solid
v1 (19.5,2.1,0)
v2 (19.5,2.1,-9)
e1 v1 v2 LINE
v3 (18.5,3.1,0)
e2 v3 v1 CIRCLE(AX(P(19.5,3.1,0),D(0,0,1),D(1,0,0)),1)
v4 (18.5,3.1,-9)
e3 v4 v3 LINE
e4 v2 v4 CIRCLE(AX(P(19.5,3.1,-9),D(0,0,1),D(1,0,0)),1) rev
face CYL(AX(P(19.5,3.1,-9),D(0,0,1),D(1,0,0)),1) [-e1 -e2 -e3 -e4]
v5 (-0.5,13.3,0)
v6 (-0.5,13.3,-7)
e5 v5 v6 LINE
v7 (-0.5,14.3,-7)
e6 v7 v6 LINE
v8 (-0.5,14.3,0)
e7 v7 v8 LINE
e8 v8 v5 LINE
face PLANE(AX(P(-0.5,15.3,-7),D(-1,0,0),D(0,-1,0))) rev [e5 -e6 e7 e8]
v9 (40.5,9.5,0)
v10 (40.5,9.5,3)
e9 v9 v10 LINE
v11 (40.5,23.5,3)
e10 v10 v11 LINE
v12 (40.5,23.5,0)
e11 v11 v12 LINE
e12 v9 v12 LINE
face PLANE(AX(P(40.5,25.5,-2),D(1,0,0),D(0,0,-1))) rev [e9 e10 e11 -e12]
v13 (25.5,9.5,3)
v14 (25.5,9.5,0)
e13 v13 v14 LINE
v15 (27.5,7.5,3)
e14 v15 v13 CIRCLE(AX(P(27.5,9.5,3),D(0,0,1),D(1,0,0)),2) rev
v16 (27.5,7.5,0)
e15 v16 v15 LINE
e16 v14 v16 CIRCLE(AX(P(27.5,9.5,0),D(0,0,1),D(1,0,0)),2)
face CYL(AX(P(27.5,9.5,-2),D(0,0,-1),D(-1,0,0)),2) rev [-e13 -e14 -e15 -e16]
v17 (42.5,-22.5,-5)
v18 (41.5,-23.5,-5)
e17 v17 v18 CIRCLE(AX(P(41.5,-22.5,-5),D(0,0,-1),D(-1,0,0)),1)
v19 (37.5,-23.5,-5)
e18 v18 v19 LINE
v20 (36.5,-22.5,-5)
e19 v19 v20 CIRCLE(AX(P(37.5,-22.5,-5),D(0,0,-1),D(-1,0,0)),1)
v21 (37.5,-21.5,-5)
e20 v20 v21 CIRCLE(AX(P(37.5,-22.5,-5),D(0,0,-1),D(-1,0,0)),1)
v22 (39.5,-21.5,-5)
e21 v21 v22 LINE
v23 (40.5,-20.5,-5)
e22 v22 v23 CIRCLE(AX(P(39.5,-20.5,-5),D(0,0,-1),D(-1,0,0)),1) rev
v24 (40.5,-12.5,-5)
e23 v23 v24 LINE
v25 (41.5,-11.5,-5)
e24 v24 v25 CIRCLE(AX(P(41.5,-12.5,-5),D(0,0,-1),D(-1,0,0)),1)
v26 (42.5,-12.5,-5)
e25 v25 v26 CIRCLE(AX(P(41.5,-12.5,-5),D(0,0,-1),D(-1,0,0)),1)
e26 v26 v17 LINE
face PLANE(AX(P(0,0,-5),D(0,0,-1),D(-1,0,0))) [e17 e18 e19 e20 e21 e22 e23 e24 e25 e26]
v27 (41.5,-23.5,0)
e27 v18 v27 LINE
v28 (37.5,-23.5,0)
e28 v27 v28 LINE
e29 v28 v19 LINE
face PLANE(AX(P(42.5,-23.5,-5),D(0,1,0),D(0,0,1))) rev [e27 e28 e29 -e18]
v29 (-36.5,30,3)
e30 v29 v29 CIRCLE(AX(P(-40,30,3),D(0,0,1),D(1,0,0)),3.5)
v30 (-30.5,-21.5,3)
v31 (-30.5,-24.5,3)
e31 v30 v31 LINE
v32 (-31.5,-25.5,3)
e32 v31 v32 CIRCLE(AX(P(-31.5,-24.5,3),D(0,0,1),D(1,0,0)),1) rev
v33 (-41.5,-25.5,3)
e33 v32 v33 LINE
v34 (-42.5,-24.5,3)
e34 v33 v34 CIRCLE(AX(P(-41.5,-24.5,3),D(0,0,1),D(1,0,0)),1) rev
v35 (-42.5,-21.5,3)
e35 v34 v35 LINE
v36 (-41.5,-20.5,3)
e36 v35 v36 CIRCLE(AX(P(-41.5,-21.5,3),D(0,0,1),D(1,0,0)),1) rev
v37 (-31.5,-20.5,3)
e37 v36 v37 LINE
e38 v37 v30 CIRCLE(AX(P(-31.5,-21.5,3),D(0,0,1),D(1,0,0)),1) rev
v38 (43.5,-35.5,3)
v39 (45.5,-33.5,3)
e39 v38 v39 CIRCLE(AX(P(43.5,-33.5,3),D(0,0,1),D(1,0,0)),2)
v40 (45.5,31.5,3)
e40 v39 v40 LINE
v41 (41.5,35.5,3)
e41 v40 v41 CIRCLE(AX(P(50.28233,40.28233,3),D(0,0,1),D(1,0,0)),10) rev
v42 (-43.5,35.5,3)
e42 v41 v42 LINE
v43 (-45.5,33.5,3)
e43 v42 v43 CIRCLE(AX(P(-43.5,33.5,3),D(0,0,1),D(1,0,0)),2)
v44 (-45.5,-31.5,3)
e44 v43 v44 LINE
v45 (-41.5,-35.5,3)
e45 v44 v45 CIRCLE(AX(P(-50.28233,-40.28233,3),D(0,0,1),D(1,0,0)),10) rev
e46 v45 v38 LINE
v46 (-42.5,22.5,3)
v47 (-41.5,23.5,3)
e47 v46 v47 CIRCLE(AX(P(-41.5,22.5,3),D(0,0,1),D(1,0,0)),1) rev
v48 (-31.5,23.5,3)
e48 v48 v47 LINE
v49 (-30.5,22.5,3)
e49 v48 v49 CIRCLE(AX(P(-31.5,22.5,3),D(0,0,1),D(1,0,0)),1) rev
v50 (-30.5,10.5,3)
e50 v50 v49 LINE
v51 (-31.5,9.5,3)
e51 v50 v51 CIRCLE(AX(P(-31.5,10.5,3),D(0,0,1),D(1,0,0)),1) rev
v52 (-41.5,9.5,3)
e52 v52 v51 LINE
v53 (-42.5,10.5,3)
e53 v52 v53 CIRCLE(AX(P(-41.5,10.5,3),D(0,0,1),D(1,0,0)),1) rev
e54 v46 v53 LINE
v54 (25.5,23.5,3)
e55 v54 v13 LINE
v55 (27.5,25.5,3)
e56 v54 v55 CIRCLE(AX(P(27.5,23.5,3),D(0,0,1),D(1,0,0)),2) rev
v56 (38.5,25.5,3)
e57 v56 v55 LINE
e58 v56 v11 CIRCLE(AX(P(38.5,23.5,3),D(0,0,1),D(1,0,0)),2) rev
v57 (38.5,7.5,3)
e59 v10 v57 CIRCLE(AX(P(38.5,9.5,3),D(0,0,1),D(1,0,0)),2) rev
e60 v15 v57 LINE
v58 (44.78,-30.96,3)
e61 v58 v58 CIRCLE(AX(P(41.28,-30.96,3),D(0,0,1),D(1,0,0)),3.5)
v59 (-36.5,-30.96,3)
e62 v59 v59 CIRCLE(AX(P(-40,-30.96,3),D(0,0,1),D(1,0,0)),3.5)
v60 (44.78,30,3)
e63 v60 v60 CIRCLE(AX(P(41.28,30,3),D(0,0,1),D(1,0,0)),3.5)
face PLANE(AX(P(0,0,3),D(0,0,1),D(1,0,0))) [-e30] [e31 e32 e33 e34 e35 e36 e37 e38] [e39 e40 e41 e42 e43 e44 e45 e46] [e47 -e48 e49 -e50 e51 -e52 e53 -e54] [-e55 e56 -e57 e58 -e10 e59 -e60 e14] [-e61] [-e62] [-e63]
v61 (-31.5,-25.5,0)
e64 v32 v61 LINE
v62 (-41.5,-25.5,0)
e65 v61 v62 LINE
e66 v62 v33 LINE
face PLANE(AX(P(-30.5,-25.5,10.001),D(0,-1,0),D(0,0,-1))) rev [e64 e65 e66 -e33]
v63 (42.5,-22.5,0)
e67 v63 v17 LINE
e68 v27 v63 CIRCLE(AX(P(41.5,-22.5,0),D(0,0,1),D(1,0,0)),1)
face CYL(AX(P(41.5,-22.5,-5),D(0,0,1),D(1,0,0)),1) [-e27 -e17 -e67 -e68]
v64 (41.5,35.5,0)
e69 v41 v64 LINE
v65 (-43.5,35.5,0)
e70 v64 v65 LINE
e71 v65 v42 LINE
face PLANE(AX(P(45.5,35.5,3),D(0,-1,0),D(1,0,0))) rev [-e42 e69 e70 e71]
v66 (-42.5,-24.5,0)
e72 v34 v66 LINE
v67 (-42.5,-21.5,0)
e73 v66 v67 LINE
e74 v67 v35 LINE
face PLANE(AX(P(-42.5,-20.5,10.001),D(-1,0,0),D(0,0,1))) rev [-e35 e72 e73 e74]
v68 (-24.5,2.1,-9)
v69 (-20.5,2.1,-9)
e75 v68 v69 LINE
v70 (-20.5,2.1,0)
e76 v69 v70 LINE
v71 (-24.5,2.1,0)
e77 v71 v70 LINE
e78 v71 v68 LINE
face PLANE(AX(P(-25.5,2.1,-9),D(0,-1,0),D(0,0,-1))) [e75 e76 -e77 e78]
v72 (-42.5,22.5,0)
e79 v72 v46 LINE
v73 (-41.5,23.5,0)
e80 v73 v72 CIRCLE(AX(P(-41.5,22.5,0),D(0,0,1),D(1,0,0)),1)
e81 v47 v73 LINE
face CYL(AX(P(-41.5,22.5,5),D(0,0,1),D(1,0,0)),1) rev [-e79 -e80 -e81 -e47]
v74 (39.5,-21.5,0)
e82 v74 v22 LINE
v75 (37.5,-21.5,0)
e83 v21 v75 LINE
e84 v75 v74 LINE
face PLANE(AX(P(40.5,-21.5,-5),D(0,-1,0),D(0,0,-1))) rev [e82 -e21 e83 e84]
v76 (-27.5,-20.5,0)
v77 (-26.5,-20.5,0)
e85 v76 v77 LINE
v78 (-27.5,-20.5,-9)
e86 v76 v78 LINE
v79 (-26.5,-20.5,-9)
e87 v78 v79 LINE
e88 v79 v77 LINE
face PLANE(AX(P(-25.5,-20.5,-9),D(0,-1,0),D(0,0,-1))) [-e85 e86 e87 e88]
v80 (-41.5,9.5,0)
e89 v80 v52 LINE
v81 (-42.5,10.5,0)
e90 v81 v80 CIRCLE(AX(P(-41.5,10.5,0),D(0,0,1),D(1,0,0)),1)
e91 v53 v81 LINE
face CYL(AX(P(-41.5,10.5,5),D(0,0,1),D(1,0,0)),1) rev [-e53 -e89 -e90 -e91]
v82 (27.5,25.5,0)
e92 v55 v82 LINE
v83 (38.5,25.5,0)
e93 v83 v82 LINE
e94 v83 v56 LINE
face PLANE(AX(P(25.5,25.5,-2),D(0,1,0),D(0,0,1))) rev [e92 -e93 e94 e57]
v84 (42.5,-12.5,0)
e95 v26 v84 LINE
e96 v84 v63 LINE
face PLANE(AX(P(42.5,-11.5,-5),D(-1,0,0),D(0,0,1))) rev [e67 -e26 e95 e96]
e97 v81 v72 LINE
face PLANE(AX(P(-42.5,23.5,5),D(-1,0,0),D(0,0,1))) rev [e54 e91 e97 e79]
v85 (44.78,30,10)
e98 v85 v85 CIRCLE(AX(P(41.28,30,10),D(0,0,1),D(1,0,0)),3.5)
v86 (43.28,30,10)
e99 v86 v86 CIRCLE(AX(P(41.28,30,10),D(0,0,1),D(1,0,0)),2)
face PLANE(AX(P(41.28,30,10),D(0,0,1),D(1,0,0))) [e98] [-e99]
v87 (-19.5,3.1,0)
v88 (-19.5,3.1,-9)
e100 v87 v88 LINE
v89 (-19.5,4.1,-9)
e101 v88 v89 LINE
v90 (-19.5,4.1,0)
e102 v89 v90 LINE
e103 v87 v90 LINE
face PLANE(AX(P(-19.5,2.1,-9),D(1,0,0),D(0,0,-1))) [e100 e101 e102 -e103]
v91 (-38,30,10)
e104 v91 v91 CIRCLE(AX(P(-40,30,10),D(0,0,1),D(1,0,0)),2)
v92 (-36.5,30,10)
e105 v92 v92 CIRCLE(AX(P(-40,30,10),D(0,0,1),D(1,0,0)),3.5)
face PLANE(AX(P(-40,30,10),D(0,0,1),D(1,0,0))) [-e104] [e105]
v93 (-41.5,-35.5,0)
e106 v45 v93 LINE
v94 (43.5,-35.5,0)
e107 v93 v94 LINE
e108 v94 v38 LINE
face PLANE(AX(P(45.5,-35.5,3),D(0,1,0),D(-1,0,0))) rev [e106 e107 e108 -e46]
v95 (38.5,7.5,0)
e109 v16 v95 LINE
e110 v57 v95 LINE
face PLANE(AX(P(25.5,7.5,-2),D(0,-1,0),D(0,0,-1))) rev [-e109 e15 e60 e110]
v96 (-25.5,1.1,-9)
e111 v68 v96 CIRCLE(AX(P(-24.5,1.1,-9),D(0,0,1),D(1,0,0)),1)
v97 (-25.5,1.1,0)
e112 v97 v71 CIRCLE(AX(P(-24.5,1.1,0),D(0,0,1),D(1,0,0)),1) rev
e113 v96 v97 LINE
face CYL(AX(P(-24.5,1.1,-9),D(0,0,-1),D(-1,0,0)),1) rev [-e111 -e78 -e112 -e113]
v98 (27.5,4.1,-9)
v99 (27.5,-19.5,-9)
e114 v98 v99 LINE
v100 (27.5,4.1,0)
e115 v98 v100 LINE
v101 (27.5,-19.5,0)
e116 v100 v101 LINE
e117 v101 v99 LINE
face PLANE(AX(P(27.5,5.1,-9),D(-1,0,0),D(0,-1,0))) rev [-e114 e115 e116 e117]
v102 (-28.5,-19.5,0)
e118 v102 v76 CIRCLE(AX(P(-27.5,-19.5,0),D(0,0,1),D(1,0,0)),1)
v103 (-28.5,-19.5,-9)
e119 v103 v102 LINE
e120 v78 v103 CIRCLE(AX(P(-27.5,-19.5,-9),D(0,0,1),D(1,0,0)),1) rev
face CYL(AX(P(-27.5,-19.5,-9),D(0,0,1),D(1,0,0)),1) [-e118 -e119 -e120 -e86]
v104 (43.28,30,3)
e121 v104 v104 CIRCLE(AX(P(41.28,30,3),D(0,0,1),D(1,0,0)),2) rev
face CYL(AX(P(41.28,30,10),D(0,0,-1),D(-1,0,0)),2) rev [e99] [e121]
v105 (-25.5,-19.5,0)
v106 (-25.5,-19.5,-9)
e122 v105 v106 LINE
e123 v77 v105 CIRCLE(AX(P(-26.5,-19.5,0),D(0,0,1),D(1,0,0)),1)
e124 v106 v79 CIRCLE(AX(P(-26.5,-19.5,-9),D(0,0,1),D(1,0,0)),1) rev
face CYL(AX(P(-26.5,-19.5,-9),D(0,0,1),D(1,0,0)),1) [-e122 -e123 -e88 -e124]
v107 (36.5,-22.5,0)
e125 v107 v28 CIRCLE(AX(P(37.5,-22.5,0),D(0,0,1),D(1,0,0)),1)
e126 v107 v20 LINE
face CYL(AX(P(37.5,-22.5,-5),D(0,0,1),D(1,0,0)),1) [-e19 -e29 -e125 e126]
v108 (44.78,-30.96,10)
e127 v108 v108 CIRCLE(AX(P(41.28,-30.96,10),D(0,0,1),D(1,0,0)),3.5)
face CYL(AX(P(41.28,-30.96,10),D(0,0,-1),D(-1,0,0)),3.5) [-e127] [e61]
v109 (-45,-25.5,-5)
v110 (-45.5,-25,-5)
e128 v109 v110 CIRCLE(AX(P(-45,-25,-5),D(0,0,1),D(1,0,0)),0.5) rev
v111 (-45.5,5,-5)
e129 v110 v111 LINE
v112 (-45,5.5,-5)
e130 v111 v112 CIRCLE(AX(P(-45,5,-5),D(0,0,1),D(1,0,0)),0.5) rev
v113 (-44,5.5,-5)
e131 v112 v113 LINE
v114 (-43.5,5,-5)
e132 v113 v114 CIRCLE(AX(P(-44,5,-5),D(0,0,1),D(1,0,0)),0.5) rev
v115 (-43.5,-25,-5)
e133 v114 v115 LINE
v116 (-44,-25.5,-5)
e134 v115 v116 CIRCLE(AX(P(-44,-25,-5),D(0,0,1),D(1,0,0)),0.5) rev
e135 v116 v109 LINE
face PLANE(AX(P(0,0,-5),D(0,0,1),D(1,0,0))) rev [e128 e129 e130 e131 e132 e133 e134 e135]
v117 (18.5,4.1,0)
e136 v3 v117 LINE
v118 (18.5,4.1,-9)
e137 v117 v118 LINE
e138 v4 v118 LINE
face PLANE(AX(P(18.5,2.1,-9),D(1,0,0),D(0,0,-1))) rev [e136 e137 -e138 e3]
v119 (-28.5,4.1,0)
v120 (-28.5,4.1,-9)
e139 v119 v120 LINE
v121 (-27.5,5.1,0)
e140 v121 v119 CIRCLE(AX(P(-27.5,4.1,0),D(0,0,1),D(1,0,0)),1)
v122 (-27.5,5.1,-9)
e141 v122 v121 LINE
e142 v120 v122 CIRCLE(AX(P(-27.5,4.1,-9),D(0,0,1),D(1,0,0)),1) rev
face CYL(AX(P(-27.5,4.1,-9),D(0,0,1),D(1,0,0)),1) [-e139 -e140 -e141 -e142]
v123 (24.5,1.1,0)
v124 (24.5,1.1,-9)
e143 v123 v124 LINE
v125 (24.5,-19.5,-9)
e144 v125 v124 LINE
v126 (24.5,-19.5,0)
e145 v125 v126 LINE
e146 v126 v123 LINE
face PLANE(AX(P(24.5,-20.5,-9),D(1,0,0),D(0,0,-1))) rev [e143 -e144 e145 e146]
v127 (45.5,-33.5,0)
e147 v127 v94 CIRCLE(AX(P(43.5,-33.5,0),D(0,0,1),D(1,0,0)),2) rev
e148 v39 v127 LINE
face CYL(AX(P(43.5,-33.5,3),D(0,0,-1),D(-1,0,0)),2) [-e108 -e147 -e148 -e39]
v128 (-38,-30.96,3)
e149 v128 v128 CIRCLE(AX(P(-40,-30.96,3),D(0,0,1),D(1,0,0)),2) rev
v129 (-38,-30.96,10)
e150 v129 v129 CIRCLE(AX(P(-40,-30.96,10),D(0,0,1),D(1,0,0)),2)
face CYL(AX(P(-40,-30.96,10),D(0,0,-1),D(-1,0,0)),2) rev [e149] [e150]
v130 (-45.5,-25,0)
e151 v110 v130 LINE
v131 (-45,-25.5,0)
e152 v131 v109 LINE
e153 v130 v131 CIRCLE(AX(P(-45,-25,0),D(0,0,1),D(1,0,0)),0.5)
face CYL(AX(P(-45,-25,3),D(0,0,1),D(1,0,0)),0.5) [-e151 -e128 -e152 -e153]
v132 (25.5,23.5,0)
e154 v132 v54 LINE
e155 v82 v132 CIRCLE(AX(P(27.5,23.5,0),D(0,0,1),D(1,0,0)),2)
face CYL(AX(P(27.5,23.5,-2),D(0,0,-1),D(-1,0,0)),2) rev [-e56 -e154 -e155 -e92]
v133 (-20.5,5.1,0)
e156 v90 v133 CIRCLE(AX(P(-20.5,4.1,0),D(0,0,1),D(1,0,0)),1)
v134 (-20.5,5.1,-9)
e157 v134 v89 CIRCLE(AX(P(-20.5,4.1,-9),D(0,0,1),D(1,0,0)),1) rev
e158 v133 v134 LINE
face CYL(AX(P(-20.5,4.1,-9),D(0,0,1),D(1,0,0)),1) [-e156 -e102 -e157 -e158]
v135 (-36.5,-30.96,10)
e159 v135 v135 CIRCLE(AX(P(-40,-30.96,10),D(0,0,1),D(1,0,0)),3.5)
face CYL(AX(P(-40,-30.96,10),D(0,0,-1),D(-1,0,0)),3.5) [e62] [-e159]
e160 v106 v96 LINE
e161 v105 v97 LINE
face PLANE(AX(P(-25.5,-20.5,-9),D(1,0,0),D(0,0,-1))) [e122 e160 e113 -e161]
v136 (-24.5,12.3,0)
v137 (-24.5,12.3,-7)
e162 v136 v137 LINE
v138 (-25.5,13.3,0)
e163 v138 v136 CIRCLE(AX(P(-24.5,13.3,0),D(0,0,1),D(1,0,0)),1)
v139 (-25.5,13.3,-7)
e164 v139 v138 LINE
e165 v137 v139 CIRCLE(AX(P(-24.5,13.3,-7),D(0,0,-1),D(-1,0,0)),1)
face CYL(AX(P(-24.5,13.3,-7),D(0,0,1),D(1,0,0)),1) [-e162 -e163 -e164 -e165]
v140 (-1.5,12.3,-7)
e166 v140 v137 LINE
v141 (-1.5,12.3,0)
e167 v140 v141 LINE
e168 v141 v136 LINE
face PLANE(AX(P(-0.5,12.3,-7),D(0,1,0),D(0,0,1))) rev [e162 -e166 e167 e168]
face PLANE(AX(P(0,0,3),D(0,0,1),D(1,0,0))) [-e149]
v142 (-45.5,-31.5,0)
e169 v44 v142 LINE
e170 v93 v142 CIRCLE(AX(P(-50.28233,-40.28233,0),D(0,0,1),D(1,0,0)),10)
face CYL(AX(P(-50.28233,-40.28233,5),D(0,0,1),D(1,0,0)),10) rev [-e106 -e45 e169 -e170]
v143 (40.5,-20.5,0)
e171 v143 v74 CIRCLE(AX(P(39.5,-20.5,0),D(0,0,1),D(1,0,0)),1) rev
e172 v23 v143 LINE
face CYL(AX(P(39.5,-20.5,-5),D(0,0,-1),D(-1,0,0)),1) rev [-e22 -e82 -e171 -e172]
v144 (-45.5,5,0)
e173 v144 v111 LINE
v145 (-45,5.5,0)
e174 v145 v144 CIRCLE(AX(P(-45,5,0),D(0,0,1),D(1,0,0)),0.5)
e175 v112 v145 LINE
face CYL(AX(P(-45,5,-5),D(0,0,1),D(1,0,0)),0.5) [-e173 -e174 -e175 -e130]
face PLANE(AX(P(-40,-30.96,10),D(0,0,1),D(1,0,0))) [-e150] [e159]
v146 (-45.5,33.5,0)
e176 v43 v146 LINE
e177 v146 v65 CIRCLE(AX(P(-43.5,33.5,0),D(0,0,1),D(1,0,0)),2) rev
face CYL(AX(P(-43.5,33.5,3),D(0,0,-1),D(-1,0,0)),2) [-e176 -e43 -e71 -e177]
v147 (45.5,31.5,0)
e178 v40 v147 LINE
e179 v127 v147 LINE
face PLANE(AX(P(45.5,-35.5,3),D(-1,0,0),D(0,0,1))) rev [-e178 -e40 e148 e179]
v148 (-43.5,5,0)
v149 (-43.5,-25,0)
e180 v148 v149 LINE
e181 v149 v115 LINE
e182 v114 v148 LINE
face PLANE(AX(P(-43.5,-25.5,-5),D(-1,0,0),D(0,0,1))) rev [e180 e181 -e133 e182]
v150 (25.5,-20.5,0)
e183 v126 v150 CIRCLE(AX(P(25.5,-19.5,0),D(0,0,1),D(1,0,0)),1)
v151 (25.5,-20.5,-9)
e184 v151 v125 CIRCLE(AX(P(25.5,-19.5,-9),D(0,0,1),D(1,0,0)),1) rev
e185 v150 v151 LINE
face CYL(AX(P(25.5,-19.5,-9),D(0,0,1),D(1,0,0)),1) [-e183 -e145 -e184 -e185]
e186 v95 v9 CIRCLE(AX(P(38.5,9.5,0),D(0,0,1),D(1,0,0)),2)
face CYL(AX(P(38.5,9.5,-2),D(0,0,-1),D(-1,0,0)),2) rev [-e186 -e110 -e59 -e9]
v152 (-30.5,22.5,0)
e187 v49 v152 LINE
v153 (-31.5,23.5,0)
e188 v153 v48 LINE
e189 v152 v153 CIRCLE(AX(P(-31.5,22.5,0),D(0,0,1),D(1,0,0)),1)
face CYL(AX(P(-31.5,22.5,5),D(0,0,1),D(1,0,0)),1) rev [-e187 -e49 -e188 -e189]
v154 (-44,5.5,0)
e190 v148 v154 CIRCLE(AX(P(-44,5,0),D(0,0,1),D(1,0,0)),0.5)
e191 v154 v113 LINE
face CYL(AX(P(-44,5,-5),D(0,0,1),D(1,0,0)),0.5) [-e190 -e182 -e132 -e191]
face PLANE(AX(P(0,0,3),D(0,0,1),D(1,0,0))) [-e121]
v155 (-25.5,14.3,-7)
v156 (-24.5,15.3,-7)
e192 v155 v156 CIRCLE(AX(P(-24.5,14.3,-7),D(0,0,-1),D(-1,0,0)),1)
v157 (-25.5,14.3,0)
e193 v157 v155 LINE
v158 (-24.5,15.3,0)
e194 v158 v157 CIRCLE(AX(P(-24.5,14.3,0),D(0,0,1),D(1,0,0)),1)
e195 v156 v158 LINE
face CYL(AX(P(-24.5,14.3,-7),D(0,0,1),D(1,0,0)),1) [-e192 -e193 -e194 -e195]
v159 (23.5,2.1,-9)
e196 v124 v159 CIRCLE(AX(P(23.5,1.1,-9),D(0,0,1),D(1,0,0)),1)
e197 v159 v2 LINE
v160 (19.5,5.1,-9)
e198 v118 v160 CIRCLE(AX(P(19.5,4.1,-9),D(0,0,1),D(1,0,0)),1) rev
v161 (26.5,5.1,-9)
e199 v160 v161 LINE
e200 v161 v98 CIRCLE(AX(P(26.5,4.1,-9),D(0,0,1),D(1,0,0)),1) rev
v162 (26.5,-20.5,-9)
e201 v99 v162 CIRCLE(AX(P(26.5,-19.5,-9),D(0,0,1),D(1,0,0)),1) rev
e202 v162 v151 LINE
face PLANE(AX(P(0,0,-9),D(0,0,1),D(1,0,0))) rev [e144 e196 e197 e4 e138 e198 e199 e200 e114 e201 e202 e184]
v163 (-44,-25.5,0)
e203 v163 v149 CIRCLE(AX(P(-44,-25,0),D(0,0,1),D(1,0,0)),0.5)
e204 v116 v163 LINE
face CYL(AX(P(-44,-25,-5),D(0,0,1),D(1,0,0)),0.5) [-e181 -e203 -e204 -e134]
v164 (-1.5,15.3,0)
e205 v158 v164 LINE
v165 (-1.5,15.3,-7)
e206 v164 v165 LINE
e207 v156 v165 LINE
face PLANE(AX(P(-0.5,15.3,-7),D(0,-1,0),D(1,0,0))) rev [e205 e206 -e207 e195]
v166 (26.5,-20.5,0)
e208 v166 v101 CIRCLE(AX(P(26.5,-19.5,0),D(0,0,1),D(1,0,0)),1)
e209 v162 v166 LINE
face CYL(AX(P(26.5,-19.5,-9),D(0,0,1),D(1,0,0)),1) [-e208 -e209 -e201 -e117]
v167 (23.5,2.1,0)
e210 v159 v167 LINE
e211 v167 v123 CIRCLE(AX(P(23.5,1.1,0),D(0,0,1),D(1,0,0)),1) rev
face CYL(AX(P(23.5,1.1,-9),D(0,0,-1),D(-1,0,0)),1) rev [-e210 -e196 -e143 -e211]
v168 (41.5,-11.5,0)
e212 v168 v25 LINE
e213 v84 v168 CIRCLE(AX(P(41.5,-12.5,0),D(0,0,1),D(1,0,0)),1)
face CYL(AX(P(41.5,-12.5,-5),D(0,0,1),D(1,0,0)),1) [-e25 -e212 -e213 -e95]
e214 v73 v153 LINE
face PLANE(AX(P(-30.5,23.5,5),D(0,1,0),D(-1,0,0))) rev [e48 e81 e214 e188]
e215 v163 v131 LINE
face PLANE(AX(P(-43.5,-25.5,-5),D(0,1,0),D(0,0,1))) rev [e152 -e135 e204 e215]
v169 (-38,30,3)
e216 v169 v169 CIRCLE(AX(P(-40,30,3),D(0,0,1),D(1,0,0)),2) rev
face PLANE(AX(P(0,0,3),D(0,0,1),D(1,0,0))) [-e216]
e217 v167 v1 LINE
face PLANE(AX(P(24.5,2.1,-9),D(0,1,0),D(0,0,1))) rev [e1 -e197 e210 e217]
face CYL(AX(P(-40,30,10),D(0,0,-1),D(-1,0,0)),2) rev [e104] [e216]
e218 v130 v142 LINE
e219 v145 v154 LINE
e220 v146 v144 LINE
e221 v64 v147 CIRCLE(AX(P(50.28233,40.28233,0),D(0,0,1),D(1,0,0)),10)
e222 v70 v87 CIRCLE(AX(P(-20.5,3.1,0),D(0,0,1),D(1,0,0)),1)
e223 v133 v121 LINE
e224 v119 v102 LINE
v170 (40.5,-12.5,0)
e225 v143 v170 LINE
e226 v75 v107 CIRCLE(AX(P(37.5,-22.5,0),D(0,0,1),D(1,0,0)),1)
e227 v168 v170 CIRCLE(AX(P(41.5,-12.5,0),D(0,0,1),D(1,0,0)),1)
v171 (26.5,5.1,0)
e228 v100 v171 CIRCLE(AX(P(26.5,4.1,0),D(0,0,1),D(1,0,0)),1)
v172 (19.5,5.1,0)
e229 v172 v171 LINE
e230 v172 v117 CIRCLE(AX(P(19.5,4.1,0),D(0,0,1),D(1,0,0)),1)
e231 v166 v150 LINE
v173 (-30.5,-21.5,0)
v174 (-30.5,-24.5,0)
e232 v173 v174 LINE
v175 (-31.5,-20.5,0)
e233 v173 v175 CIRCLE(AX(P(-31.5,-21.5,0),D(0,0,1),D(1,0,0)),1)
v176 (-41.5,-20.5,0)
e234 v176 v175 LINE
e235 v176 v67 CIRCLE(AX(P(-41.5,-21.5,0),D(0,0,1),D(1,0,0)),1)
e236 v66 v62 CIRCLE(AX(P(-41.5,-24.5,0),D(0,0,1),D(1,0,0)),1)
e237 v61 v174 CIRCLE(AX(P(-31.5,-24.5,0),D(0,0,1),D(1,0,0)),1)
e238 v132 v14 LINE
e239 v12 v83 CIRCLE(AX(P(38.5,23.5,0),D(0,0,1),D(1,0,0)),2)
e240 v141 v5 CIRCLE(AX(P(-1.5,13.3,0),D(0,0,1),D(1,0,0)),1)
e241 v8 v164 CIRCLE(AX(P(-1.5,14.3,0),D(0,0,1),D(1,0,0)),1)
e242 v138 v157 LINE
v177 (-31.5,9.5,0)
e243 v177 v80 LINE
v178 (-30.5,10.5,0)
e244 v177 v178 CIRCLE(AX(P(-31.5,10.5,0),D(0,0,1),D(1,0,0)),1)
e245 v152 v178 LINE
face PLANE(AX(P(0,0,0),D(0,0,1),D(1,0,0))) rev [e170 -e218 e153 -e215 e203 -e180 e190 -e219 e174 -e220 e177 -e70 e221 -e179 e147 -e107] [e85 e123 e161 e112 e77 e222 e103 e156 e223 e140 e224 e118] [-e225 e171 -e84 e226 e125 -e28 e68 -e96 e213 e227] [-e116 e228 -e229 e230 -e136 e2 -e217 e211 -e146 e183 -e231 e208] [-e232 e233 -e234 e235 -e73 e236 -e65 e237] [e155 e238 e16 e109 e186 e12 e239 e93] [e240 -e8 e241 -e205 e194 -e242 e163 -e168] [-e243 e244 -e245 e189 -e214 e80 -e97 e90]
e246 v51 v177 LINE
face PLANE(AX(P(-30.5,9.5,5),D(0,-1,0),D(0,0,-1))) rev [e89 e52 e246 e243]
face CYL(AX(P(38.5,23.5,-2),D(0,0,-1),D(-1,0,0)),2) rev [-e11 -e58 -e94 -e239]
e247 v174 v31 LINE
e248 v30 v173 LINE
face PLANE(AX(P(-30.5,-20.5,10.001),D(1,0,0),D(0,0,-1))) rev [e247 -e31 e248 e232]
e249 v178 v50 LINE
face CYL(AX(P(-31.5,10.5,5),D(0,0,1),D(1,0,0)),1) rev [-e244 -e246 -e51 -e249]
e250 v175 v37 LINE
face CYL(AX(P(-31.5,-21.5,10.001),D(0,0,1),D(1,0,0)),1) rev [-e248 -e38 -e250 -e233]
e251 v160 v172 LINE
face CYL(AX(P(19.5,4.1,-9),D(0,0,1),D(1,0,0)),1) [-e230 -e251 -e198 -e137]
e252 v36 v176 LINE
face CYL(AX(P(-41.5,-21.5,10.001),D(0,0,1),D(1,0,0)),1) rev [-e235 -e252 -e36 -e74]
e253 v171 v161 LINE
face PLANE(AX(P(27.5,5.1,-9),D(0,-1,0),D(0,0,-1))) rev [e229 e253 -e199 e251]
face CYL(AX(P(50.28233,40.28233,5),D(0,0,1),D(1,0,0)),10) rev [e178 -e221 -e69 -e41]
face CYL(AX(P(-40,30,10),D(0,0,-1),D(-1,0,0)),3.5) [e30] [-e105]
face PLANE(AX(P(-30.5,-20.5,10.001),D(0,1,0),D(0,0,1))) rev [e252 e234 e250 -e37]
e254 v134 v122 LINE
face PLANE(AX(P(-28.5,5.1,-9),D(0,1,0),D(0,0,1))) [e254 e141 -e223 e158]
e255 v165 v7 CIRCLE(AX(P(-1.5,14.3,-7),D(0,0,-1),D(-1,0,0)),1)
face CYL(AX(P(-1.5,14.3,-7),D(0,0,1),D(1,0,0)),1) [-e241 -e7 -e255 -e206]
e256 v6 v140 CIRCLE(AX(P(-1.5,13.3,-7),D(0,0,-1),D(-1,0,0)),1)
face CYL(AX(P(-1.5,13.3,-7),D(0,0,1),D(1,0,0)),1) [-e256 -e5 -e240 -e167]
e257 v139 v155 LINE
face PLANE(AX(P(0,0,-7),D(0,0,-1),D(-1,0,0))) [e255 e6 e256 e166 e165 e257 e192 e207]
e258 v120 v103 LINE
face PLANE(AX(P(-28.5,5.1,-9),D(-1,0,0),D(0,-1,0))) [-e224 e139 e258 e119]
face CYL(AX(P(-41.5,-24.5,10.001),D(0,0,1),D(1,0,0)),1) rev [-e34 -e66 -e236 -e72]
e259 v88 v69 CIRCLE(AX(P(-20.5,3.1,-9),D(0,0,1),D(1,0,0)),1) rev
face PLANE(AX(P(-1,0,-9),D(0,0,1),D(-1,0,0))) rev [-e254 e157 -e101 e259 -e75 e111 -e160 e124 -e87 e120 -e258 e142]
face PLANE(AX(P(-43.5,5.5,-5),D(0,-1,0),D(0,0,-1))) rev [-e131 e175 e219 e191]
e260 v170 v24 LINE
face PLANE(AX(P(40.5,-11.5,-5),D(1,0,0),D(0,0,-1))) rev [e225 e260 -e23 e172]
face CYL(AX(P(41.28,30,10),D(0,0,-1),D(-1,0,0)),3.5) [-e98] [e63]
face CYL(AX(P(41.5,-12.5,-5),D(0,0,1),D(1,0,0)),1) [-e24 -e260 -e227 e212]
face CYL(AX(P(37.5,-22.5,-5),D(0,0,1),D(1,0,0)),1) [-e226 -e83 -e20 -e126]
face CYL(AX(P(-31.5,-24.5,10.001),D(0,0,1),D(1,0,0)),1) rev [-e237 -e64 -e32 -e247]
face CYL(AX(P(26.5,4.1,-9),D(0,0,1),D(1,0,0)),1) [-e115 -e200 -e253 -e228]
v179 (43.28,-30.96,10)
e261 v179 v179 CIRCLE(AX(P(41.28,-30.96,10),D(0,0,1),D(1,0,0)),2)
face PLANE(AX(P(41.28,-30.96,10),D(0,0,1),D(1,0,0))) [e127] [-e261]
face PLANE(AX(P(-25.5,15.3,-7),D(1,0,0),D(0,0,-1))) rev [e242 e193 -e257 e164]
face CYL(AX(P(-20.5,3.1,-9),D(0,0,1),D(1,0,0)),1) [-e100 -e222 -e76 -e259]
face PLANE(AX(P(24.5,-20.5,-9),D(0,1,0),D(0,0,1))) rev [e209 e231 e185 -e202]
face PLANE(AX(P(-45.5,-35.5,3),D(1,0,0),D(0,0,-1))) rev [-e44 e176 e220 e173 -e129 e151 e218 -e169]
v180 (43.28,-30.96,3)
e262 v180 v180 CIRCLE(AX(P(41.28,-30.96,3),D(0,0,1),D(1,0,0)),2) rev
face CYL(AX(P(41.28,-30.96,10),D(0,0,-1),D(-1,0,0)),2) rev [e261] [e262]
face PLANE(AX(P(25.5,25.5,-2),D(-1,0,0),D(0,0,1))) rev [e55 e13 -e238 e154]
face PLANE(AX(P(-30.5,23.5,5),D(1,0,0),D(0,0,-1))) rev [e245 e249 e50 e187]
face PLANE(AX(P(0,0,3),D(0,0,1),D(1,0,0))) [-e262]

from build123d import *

# Parameters (mm, degrees)
SKETCH1_W            = 91
SKETCH1_H            = 71
BOSS_EXTRUDE1_DEPTH  = 3
SKETCH3_W            = 4
SKETCH3_H            = 4
CUT_EXTRUDE1_DEPTH   = 5
FILLET2_R            = 10
FILLET3_R            = 2
SKETCH4_W            = 15
SKETCH4_H            = 18
CUT_EXTRUDE2_DEPTH   = 5
SKETCH5_R            = 3.5
SKETCH5_R_2          = 2
BOSS_EXTRUDE2_DEPTH  = 7
LPATTERN1_COUNT      = 2
LPATTERN1_PITCH      = 81.28
LPATTERN1_COUNT_DIR2 = 2
LPATTERN1_PITCH_DIR2 = 60.96
FILLET4_R            = 2
BOSS_EXTRUDE4_DEPTH  = 9
FILLET5_R            = 1
BOSS_EXTRUDE5_DEPTH  = 5
FILLET6_R            = 1
SKETCH9_W            = 25
SKETCH9_H            = 3
BOSS_EXTRUDE6_DEPTH  = 7
FILLET7_R            = 1
SKETCH10_W           = 12
SKETCH10_H           = 14
CUT_EXTRUDE3_DEPTH   = 5
FILLET8_R            = 1
CUT_EXTRUDE4_REACH   = 60.57
SKETCH11_W           = 12
SKETCH11_H           = 5
FILLET9_R            = 1
SKETCH12_W           = 2
SKETCH12_H           = 31
BOSS_EXTRUDE7_DEPTH  = 5
FILLET10_R           = 0.5


# Some blends are built 0.0001 mm under size
with BuildPart() as part:
    # Sketch1 → Boss-Extrude1 (new body)
    with BuildSketch(Plane.XY):
        Rectangle(SKETCH1_W, SKETCH1_H)
    extrude(amount=BOSS_EXTRUDE1_DEPTH)

    # Sketch3 → Cut-Extrude1 (cut)
    with BuildSketch(Plane(origin=(0, 0, 0), x_dir=(-1, 0, 0), z_dir=(0, 0, -1))):
        with Locations((-43.5, 33.5)):
            Rectangle(SKETCH3_W, SKETCH3_H)
        with Locations((43.5, -33.5)):
            Rectangle(SKETCH3_W, SKETCH3_H)
    extrude(amount=-CUT_EXTRUDE1_DEPTH, mode=Mode.SUBTRACT)

    # Fillet2
    # the kernel refuses this fillet: 10 mm, written as the material it adds along each edge
    with BuildSketch(Plane(origin=(-41.5, -31.5, 0), x_dir=(0, -1, 0), z_dir=(0, 0, 1))) as fillet2_piece_1:
        with BuildLine():
            CenterArc((8.782329983, -8.782329983), FILLET2_R, 118.570059811, 32.859880379)
            Line((0, -4), (0, 0))
            Line((0, 0), (4, 0))
        make_face()
    extrude(amount=3)
    with BuildSketch(Plane(origin=(41.5, 31.5, 0), x_dir=(1, 0, 0), z_dir=(0, 0, 1))) as fillet2_piece_2:
        with BuildLine():
            CenterArc((8.782329983, 8.782329983), FILLET2_R, 208.570059811, 32.859880379)
            Line((0, 4), (0, 0))
            Line((0, 0), (4, 0))
        make_face()
    extrude(amount=3)

    # Fillet3
    fillet3_edges = [part.edges().sort_by_distance(p)[0] for p in [
        (-45.5, 35.5, 1.5),
        (45.5, -35.5, 1.5),
    ]]
    fillet(fillet3_edges, radius=FILLET3_R)

    # Sketch4 → Cut-Extrude2 (cut)
    with BuildSketch(Plane.XY.offset(3)):
        with Locations((33, 16.5)):
            Rectangle(SKETCH4_W, SKETCH4_H)
    extrude(amount=-CUT_EXTRUDE2_DEPTH, mode=Mode.SUBTRACT)

    # Sketch5 → Boss-Extrude2 (add)
    with BuildSketch(Plane.XY.offset(3)):
        with Locations((-40, 30)):
            Circle(SKETCH5_R)
        with Locations((-40, 30)):
            Circle(SKETCH5_R_2, mode=Mode.SUBTRACT)
    boss_extrude2 = extrude(amount=BOSS_EXTRUDE2_DEPTH)

    # LPattern1: Boss-Extrude2 2 × 2
    with Locations(*[(i * LPATTERN1_PITCH, -j * LPATTERN1_PITCH_DIR2, 0) for i in range(LPATTERN1_COUNT) for j in range(LPATTERN1_COUNT_DIR2) if (i, j) != (0, 0)]):
        add(boss_extrude2)

    # Fillet4
    fillet4_edges = [part.edges().sort_by_distance(p)[0] for p in [
        (25.5, 7.5, 1.5),
        (25.5, 25.5, 1.5),
        (40.5, 25.5, 1.5),
        (40.5, 7.5, 1.5),
    ]]
    fillet(fillet4_edges, radius=FILLET4_R)

    # Sketch7 → Boss-Extrude4 (add)
    with BuildSketch(Plane(origin=(0, 0, 0), x_dir=(-1, 0, 0), z_dir=(0, 0, -1))):
        Polygon((-24.5, 2.1), (-18.5, 2.1), (-18.5, 5.1), (-27.5, 5.1), (-27.5, -20.5), (-24.5, -20.5), align=None)
    boss_extrude4 = extrude(amount=BOSS_EXTRUDE4_DEPTH)

    # Mirror1: Boss-Extrude4 across plane
    add(boss_extrude4.mirror(Plane(origin=(-0.5, 0, 0), x_dir=(0, 0, 1), z_dir=(1, 0, 0))))

    # Fillet5
    fillet5_edges = [part.edges().sort_by_distance(p)[0] for p in [
        (24.5, -20.5, -4.5),
        (24.5, 2.1, -4.5),
        (18.5, 2.1, -4.5),
        (18.5, 5.1, -4.5),
        (27.5, 5.1, -4.5),
        (27.5, -20.5, -4.5),
        (-25.5, 2.1, -4.5),
        (-25.5, -20.5, -4.5),
        (-28.5, -20.5, -4.5),
        (-28.5, 5.1, -4.5),
        (-19.5, 5.1, -4.5),
        (-19.5, 2.1, -4.5),
    ]]
    fillet(fillet5_edges, radius=FILLET5_R)

    # Sketch8 → Boss-Extrude5 (add)
    with BuildSketch(Plane(origin=(0, 0, 0), x_dir=(-1, 0, 0), z_dir=(0, 0, -1))):
        Polygon((-40.5, -11.5), (-40.5, -21.5), (-36.5, -21.5), (-36.5, -23.5), (-42.5, -23.5), (-42.5, -11.5), align=None)
    extrude(amount=BOSS_EXTRUDE5_DEPTH)

    # Fillet6
    fillet6_edges = [part.edges().sort_by_distance(p)[0] for p in [
        (40.5, -11.5, -2.5),
        (40.5, -21.5, -2.5),
        (42.5, -11.5, -2.5),
        (42.5, -23.5, -2.5),
        (36.5, -23.5, -2.5),
        (36.5, -21.5, -2.5),
    ]]
    fillet(fillet6_edges, radius=FILLET6_R - 0.0001)  # a hair under: the kernel refuses the full size

    # Sketch9 → Boss-Extrude6 (add)
    with BuildSketch(Plane(origin=(0, 0, 0), x_dir=(-1, 0, 0), z_dir=(0, 0, -1))):
        with Locations((13, 13.8)):
            Rectangle(SKETCH9_W, SKETCH9_H)
    extrude(amount=BOSS_EXTRUDE6_DEPTH)

    # Fillet7
    fillet7_edges = [part.edges().sort_by_distance(p)[0] for p in [
        (-0.5, 15.3, -3.5),
        (-0.5, 12.3, -3.5),
        (-25.5, 12.3, -3.5),
        (-25.5, 15.3, -3.5),
    ]]
    fillet(fillet7_edges, radius=FILLET7_R)

    # Sketch10 → Cut-Extrude3 (cut)
    with BuildSketch(Plane(origin=(0, 0, 0), x_dir=(-1, 0, 0), z_dir=(0, 0, -1))):
        with Locations((36.5, 16.5)):
            Rectangle(SKETCH10_W, SKETCH10_H)
    extrude(amount=-CUT_EXTRUDE3_DEPTH, mode=Mode.SUBTRACT)

    # Fillet8
    fillet8_edges = [part.edges().sort_by_distance(p)[0] for p in [
        (-30.5, 9.5, 1.5),
        (-30.5, 23.5, 1.5),
        (-42.5, 23.5, 1.5),
        (-42.5, 9.5, 1.5),
    ]]
    fillet(fillet8_edges, radius=FILLET8_R)

    # Sketch11 → Cut-Extrude4 (cut, up to next)
    with BuildSketch(Plane(origin=(0, 0, 0), x_dir=(-1, 0, 0), z_dir=(0, 0, -1)), mode=Mode.PRIVATE) as cut_extrude4_sk1:
        with Locations((36.5, -23)):
            Rectangle(SKETCH11_W, SKETCH11_H)
    cut_extrude4_tool1 = extrude(cut_extrude4_sk1.sketch, amount=-CUT_EXTRUDE4_REACH, mode=Mode.PRIVATE) & part.part
    add(cut_extrude4_tool1.solids().sort_by_distance((-36.5, -23, 0))[0], mode=Mode.SUBTRACT)

    # Fillet9
    fillet9_edges = [part.edges().sort_by_distance(p)[0] for p in [
        (-30.5, -25.5, 1.5),
        (-30.5, -20.5, 1.5),
        (-42.5, -20.5, 1.5),
        (-42.5, -25.5, 1.5),
    ]]
    fillet(fillet9_edges, radius=FILLET9_R)

    # Sketch12 → Boss-Extrude7 (add)
    with BuildSketch(Plane(origin=(0, 0, 0), x_dir=(-1, 0, 0), z_dir=(0, 0, -1))):
        with Locations((44.5, -10)):
            Rectangle(SKETCH12_W, SKETCH12_H)
    extrude(amount=BOSS_EXTRUDE7_DEPTH)

    # Fillet10
    fillet10_edges = [part.edges().sort_by_distance(p)[0] for p in [
        (-43.5, 5.5, -2.5),
        (-43.5, -25.5, -2.5),
        (-45.5, -25.5, -2.5),
        (-45.5, 5.5, -2.5),
    ]]
    fillet(fillet10_edges, radius=FILLET10_R)


solid = part.part
